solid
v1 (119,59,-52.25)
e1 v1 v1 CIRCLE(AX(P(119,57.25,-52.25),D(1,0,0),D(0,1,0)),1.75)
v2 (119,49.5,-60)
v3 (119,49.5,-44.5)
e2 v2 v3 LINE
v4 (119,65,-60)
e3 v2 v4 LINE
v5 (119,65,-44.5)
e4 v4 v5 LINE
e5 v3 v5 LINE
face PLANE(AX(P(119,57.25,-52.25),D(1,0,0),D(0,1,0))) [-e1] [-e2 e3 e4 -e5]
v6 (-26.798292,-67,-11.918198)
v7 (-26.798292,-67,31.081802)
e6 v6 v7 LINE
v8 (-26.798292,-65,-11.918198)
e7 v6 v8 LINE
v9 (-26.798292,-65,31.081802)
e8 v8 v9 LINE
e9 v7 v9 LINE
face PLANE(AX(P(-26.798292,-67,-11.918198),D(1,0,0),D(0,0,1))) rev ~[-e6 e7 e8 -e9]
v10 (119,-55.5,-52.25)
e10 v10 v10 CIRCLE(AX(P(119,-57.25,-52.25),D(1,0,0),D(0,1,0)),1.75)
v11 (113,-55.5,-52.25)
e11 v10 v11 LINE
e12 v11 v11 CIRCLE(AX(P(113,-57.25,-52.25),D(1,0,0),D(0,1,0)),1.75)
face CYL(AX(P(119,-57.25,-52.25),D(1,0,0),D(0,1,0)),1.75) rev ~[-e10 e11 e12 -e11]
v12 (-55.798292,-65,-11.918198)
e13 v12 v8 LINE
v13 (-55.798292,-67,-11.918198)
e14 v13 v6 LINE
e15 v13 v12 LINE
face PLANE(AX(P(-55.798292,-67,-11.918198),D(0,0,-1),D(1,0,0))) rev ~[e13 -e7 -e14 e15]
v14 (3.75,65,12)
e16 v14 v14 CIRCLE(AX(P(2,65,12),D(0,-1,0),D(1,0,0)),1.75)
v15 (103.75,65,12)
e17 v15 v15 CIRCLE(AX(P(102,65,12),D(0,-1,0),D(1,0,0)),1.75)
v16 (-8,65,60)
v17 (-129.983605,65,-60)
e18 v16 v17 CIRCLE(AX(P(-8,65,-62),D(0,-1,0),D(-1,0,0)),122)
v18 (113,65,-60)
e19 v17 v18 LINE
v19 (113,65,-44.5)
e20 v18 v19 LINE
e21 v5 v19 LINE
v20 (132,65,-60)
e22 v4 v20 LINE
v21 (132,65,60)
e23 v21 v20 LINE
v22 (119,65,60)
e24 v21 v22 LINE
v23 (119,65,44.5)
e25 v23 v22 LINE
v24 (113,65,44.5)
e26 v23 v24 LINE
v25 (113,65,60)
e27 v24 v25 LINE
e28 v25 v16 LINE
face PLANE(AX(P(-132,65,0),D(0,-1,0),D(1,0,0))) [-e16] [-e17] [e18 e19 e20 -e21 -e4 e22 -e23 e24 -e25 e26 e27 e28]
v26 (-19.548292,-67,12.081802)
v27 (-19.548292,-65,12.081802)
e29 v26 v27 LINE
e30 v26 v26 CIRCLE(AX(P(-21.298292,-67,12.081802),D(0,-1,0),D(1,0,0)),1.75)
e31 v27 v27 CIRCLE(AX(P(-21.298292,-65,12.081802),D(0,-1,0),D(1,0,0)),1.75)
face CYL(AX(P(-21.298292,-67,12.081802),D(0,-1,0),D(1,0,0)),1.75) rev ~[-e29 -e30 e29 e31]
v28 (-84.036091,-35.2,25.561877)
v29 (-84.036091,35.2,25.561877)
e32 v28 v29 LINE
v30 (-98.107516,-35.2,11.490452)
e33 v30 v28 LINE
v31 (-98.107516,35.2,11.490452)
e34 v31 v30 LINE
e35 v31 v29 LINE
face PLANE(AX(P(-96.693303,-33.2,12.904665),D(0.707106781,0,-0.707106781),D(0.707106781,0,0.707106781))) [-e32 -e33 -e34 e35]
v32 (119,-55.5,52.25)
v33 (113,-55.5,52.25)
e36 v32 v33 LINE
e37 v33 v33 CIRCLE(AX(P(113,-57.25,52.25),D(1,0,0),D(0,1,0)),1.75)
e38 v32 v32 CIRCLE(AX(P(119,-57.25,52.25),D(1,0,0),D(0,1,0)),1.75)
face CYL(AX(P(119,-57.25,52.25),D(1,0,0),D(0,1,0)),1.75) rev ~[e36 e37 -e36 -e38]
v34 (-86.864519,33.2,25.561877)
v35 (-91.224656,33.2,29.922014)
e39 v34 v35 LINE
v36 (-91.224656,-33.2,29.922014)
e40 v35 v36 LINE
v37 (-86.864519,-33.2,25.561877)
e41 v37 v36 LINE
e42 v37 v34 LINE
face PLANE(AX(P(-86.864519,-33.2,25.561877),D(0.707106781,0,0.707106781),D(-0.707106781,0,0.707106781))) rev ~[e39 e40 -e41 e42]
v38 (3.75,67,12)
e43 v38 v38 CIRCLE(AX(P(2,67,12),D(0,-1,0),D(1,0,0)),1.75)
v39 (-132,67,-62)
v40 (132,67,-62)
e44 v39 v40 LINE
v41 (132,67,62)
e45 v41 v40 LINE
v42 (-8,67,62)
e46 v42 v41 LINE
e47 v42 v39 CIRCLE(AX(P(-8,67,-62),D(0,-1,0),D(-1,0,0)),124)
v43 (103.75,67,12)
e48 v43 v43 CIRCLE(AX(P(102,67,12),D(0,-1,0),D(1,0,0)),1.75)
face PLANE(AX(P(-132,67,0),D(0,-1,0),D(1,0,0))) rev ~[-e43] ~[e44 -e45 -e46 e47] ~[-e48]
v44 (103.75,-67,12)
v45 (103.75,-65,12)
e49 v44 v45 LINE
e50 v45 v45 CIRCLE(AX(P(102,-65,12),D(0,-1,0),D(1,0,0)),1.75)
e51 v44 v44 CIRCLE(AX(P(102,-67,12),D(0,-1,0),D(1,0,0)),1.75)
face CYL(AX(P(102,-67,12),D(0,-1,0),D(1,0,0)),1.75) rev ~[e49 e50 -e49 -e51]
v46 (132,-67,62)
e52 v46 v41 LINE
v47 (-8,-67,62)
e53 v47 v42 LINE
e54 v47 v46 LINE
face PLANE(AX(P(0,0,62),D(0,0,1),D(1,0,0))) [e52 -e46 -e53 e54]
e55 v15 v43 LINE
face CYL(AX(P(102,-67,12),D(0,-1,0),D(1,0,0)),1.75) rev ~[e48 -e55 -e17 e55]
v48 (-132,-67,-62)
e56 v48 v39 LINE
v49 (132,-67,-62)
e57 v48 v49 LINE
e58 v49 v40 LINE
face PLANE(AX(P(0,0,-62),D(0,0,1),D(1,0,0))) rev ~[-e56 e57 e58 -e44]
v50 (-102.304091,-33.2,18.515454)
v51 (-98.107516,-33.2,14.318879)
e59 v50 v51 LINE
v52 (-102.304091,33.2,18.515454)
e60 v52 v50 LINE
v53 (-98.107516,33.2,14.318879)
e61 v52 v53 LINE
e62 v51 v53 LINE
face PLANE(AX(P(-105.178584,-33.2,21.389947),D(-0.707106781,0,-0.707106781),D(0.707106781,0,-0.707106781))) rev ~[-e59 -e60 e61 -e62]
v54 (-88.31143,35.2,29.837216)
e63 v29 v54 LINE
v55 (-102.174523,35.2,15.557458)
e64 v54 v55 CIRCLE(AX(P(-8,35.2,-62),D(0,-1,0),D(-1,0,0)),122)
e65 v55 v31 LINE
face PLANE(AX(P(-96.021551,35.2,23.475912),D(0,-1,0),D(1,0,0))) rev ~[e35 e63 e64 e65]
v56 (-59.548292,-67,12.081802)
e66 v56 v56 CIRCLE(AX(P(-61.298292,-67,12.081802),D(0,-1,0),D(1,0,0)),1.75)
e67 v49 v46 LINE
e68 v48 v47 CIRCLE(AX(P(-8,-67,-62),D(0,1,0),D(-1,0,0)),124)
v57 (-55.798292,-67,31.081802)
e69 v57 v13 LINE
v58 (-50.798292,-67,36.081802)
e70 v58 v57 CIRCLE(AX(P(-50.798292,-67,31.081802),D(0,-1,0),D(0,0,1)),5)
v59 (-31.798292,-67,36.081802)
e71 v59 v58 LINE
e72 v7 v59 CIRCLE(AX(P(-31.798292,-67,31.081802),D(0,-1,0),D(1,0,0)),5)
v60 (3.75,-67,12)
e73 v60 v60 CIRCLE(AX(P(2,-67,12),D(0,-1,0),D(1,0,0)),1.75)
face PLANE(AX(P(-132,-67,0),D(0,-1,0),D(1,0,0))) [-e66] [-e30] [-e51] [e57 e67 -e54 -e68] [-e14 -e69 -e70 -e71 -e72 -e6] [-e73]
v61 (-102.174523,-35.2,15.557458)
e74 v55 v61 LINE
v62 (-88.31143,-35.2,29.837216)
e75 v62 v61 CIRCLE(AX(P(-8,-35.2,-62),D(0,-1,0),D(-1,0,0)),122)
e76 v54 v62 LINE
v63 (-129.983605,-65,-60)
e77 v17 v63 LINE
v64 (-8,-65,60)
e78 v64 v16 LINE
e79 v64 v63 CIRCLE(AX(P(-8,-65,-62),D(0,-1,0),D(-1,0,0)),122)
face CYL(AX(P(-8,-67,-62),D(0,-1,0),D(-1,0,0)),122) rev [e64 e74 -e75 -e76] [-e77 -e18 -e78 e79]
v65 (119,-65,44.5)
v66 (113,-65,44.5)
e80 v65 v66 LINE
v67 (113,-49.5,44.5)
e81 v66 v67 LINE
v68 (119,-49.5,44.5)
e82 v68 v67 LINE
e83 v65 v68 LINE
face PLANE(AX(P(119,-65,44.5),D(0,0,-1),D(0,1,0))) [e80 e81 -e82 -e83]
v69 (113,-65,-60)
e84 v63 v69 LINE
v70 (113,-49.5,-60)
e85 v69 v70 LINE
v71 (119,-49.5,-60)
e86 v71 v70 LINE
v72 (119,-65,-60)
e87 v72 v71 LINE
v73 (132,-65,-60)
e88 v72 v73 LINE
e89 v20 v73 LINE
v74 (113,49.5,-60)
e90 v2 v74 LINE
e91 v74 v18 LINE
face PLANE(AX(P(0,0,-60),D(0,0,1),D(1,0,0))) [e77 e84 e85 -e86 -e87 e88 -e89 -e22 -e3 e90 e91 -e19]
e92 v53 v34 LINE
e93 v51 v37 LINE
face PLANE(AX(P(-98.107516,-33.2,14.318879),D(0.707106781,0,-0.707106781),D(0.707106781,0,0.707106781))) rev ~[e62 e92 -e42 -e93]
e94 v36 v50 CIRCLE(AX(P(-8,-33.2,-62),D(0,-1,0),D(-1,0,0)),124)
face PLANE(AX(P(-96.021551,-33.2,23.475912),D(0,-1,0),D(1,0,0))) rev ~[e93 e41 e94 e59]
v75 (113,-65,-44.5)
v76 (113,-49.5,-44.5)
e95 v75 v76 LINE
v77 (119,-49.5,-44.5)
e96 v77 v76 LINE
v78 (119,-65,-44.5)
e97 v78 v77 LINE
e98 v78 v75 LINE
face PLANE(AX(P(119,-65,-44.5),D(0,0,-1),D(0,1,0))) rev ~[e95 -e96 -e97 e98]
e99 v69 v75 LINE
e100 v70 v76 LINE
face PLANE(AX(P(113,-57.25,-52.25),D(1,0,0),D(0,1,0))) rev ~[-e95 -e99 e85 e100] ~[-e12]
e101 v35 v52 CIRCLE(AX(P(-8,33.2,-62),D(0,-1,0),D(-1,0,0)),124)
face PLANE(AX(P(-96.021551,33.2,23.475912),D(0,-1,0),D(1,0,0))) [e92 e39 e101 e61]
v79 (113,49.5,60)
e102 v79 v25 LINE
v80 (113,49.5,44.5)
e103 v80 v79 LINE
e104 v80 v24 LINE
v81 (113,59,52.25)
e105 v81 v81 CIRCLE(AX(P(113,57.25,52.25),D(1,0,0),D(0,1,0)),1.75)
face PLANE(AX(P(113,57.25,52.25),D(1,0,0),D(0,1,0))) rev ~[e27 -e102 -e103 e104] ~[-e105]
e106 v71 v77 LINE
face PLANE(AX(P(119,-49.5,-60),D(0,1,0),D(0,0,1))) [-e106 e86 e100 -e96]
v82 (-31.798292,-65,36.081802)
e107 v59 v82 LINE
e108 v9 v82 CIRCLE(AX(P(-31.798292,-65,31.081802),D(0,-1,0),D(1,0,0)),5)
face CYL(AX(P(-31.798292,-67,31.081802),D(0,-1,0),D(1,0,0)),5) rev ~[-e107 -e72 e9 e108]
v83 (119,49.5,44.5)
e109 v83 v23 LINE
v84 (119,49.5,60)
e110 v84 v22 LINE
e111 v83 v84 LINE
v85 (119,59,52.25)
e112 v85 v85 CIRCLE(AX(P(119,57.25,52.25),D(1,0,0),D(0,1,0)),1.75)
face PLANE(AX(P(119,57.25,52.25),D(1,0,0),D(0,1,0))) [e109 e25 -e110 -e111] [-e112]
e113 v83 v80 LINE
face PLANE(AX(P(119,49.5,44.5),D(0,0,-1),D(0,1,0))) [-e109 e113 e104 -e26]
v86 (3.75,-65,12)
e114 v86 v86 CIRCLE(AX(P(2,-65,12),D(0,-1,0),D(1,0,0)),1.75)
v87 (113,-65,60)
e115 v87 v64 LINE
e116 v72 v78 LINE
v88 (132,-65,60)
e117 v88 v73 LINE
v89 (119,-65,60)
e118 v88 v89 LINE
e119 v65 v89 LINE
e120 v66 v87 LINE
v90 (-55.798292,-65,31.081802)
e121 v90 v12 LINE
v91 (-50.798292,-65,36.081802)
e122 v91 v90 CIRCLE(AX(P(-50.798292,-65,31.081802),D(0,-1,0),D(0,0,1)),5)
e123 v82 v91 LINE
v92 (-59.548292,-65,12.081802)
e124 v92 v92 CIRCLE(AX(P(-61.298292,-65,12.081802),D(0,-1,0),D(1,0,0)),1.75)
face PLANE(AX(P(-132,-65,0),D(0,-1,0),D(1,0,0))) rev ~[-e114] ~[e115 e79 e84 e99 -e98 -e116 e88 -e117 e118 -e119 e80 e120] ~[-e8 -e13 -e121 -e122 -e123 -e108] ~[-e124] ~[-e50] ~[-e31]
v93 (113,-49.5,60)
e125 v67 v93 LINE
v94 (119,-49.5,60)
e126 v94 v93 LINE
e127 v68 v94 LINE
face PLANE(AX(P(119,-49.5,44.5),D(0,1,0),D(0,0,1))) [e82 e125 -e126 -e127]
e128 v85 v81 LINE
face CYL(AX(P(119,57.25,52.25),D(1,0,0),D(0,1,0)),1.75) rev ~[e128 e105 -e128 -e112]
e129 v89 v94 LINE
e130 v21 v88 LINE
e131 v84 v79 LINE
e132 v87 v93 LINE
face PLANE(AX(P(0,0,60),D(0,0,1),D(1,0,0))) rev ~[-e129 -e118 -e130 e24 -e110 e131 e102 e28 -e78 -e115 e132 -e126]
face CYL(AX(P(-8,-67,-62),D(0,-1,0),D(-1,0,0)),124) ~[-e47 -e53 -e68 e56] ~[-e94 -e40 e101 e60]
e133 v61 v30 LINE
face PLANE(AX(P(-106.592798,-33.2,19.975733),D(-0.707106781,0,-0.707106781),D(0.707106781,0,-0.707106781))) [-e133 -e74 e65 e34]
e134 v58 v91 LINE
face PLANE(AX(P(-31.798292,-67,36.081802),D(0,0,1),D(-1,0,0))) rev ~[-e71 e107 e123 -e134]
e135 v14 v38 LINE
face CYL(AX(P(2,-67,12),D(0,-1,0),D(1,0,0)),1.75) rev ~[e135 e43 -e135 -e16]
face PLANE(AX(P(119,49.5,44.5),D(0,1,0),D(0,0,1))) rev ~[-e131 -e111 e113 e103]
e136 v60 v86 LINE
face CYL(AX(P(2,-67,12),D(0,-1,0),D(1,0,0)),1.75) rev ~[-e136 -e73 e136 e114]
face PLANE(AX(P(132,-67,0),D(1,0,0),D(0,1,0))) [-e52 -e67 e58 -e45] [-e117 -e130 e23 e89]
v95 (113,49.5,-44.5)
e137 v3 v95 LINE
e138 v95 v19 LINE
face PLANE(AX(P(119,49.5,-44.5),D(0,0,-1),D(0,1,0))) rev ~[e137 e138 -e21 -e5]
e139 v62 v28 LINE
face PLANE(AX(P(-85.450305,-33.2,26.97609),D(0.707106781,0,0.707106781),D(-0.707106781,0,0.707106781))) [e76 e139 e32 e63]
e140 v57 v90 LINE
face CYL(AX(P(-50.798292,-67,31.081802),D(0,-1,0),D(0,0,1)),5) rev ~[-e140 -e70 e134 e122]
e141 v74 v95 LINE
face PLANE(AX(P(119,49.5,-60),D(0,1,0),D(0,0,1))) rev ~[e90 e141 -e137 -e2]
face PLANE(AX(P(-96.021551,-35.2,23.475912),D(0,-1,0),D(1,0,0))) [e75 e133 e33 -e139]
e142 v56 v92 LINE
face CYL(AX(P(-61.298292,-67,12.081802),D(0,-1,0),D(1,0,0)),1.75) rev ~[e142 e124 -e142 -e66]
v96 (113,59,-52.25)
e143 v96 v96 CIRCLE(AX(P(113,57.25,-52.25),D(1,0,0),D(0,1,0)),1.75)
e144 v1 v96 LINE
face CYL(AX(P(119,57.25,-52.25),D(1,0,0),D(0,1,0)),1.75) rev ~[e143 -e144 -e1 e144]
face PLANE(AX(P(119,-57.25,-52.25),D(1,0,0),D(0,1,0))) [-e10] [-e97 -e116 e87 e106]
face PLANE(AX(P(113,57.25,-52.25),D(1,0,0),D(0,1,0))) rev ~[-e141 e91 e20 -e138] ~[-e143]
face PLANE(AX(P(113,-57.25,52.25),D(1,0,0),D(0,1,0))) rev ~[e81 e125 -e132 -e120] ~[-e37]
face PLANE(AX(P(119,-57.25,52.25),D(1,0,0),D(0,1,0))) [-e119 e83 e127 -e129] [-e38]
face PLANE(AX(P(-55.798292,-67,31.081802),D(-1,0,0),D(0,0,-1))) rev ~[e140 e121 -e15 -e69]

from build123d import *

# Parameters (mm, degrees)
F0_W      = 264
F0_H      = 134
F1_DEPTH  = 62
F3_DEPTH  = 150
F7_START  = -33.8
F7_DEPTH  = 66.4
F8_T      = -2
F9_R      = 1.75
F10_DEPTH = 134.001
F11_R     = 1.75
F12_DEPTH = 25
F14_START = -13
F13_W     = 15.5
F13_H     = 15.5
F13_R     = 1.75
F14_DEPTH = 6


# Not quite as in the source:
# - a feature of the source that left no trace in its solid (it failed there, or was rolled back) is left out


with BuildPart() as f1:
    # F0 (on Top) → F1 (new body, symmetric)
    with BuildSketch(Plane.XY):
        Rectangle(F0_W, F0_H)
    extrude(amount=F1_DEPTH, both=True)

    # F2 (on face) → F3 (cut)
    with BuildSketch(Plane.XZ.offset(67)):
        with BuildLine():
            ThreePointArc((-132, -62), (-95.6812408671, 25.6812408671), (-8, 62))
            Line((-8, 62), (-132, 62))
            Line((-132, 62), (-132, -62))
        make_face()
    extrude(amount=-F3_DEPTH, mode=Mode.SUBTRACT)

    # F6 (on face) → F7 (cut)
    with BuildSketch(Plane.XZ.offset(67).offset(F7_START)):
        Polygon((-105.1785842524, 21.3899467149), (-98.1075164406, 14.318878903), (-86.8645186197, 25.5618767239), (-93.9355864316, 32.6329445358), align=None)
    extrude(amount=-F7_DEPTH, mode=Mode.SUBTRACT)

    # F8
    f8_openings = [f1.faces().sort_by_distance(p)[0] for p in [
        (132, 0, 0),
    ]]
    offset(amount=F8_T, openings=f8_openings, kind=Kind.INTERSECTION)

    # F9 (on face) → F10 (cut, through all)
    with BuildSketch(Plane.XZ.offset(67)):
        with Locations((102, 12)):
            Circle(F9_R)
        with Locations((2, 12)):
            Circle(F9_R)
    extrude(amount=-F10_DEPTH, mode=Mode.SUBTRACT)

    # F11 (on face) → F12 (cut)
    with BuildSketch(Plane.XZ.offset(67)):
        with BuildLine():
            ThreePointArc((-26.79829216, 31.0818016827), (-28.2627582541, 34.6173355886), (-31.79829216, 36.0818016827))
            Line((-31.79829216, 36.0818016827), (-50.79829216, 36.0818016827))
            ThreePointArc((-50.79829216, 36.0818016827), (-54.333826066, 34.6173355886), (-55.79829216, 31.0818016827))
            Line((-55.79829216, 31.0818016827), (-55.79829216, -11.9181983173))
            Line((-55.79829216, -11.9181983173), (-26.79829216, -11.9181983173))
            Line((-26.79829216, -11.9181983173), (-26.79829216, 31.0818016827))
        make_face()
        with Locations((-61.29829216, 12.0818016827)):
            Circle(F11_R)
        with Locations((-21.29829216, 12.0818016827)):
            Circle(F11_R)
    extrude(amount=-F12_DEPTH, mode=Mode.SUBTRACT)

    # F13 (on face) → F14 (join)
    with BuildSketch(Plane.YZ.offset(132).offset(F14_START)):
        with Locations((-57.25, 52.25)):
            Rectangle(F13_W, F13_H)
        with Locations((-57.25, 52.25)):
            Circle(F13_R, mode=Mode.SUBTRACT)
        with Locations((57.25, 52.25)):
            Rectangle(F13_W, F13_H)
        with Locations((57.25, 52.25)):
            Circle(F13_R, mode=Mode.SUBTRACT)
        with Locations((57.25, -52.25)):
            Rectangle(F13_W, F13_H)
        with Locations((57.25, -52.25)):
            Circle(F13_R, mode=Mode.SUBTRACT)
        with Locations((-57.25, -52.25)):
            Rectangle(F13_W, F13_H)
        with Locations((-57.25, -52.25)):
            Circle(F13_R, mode=Mode.SUBTRACT)
    extrude(amount=-F14_DEPTH)


solid = f1.part
